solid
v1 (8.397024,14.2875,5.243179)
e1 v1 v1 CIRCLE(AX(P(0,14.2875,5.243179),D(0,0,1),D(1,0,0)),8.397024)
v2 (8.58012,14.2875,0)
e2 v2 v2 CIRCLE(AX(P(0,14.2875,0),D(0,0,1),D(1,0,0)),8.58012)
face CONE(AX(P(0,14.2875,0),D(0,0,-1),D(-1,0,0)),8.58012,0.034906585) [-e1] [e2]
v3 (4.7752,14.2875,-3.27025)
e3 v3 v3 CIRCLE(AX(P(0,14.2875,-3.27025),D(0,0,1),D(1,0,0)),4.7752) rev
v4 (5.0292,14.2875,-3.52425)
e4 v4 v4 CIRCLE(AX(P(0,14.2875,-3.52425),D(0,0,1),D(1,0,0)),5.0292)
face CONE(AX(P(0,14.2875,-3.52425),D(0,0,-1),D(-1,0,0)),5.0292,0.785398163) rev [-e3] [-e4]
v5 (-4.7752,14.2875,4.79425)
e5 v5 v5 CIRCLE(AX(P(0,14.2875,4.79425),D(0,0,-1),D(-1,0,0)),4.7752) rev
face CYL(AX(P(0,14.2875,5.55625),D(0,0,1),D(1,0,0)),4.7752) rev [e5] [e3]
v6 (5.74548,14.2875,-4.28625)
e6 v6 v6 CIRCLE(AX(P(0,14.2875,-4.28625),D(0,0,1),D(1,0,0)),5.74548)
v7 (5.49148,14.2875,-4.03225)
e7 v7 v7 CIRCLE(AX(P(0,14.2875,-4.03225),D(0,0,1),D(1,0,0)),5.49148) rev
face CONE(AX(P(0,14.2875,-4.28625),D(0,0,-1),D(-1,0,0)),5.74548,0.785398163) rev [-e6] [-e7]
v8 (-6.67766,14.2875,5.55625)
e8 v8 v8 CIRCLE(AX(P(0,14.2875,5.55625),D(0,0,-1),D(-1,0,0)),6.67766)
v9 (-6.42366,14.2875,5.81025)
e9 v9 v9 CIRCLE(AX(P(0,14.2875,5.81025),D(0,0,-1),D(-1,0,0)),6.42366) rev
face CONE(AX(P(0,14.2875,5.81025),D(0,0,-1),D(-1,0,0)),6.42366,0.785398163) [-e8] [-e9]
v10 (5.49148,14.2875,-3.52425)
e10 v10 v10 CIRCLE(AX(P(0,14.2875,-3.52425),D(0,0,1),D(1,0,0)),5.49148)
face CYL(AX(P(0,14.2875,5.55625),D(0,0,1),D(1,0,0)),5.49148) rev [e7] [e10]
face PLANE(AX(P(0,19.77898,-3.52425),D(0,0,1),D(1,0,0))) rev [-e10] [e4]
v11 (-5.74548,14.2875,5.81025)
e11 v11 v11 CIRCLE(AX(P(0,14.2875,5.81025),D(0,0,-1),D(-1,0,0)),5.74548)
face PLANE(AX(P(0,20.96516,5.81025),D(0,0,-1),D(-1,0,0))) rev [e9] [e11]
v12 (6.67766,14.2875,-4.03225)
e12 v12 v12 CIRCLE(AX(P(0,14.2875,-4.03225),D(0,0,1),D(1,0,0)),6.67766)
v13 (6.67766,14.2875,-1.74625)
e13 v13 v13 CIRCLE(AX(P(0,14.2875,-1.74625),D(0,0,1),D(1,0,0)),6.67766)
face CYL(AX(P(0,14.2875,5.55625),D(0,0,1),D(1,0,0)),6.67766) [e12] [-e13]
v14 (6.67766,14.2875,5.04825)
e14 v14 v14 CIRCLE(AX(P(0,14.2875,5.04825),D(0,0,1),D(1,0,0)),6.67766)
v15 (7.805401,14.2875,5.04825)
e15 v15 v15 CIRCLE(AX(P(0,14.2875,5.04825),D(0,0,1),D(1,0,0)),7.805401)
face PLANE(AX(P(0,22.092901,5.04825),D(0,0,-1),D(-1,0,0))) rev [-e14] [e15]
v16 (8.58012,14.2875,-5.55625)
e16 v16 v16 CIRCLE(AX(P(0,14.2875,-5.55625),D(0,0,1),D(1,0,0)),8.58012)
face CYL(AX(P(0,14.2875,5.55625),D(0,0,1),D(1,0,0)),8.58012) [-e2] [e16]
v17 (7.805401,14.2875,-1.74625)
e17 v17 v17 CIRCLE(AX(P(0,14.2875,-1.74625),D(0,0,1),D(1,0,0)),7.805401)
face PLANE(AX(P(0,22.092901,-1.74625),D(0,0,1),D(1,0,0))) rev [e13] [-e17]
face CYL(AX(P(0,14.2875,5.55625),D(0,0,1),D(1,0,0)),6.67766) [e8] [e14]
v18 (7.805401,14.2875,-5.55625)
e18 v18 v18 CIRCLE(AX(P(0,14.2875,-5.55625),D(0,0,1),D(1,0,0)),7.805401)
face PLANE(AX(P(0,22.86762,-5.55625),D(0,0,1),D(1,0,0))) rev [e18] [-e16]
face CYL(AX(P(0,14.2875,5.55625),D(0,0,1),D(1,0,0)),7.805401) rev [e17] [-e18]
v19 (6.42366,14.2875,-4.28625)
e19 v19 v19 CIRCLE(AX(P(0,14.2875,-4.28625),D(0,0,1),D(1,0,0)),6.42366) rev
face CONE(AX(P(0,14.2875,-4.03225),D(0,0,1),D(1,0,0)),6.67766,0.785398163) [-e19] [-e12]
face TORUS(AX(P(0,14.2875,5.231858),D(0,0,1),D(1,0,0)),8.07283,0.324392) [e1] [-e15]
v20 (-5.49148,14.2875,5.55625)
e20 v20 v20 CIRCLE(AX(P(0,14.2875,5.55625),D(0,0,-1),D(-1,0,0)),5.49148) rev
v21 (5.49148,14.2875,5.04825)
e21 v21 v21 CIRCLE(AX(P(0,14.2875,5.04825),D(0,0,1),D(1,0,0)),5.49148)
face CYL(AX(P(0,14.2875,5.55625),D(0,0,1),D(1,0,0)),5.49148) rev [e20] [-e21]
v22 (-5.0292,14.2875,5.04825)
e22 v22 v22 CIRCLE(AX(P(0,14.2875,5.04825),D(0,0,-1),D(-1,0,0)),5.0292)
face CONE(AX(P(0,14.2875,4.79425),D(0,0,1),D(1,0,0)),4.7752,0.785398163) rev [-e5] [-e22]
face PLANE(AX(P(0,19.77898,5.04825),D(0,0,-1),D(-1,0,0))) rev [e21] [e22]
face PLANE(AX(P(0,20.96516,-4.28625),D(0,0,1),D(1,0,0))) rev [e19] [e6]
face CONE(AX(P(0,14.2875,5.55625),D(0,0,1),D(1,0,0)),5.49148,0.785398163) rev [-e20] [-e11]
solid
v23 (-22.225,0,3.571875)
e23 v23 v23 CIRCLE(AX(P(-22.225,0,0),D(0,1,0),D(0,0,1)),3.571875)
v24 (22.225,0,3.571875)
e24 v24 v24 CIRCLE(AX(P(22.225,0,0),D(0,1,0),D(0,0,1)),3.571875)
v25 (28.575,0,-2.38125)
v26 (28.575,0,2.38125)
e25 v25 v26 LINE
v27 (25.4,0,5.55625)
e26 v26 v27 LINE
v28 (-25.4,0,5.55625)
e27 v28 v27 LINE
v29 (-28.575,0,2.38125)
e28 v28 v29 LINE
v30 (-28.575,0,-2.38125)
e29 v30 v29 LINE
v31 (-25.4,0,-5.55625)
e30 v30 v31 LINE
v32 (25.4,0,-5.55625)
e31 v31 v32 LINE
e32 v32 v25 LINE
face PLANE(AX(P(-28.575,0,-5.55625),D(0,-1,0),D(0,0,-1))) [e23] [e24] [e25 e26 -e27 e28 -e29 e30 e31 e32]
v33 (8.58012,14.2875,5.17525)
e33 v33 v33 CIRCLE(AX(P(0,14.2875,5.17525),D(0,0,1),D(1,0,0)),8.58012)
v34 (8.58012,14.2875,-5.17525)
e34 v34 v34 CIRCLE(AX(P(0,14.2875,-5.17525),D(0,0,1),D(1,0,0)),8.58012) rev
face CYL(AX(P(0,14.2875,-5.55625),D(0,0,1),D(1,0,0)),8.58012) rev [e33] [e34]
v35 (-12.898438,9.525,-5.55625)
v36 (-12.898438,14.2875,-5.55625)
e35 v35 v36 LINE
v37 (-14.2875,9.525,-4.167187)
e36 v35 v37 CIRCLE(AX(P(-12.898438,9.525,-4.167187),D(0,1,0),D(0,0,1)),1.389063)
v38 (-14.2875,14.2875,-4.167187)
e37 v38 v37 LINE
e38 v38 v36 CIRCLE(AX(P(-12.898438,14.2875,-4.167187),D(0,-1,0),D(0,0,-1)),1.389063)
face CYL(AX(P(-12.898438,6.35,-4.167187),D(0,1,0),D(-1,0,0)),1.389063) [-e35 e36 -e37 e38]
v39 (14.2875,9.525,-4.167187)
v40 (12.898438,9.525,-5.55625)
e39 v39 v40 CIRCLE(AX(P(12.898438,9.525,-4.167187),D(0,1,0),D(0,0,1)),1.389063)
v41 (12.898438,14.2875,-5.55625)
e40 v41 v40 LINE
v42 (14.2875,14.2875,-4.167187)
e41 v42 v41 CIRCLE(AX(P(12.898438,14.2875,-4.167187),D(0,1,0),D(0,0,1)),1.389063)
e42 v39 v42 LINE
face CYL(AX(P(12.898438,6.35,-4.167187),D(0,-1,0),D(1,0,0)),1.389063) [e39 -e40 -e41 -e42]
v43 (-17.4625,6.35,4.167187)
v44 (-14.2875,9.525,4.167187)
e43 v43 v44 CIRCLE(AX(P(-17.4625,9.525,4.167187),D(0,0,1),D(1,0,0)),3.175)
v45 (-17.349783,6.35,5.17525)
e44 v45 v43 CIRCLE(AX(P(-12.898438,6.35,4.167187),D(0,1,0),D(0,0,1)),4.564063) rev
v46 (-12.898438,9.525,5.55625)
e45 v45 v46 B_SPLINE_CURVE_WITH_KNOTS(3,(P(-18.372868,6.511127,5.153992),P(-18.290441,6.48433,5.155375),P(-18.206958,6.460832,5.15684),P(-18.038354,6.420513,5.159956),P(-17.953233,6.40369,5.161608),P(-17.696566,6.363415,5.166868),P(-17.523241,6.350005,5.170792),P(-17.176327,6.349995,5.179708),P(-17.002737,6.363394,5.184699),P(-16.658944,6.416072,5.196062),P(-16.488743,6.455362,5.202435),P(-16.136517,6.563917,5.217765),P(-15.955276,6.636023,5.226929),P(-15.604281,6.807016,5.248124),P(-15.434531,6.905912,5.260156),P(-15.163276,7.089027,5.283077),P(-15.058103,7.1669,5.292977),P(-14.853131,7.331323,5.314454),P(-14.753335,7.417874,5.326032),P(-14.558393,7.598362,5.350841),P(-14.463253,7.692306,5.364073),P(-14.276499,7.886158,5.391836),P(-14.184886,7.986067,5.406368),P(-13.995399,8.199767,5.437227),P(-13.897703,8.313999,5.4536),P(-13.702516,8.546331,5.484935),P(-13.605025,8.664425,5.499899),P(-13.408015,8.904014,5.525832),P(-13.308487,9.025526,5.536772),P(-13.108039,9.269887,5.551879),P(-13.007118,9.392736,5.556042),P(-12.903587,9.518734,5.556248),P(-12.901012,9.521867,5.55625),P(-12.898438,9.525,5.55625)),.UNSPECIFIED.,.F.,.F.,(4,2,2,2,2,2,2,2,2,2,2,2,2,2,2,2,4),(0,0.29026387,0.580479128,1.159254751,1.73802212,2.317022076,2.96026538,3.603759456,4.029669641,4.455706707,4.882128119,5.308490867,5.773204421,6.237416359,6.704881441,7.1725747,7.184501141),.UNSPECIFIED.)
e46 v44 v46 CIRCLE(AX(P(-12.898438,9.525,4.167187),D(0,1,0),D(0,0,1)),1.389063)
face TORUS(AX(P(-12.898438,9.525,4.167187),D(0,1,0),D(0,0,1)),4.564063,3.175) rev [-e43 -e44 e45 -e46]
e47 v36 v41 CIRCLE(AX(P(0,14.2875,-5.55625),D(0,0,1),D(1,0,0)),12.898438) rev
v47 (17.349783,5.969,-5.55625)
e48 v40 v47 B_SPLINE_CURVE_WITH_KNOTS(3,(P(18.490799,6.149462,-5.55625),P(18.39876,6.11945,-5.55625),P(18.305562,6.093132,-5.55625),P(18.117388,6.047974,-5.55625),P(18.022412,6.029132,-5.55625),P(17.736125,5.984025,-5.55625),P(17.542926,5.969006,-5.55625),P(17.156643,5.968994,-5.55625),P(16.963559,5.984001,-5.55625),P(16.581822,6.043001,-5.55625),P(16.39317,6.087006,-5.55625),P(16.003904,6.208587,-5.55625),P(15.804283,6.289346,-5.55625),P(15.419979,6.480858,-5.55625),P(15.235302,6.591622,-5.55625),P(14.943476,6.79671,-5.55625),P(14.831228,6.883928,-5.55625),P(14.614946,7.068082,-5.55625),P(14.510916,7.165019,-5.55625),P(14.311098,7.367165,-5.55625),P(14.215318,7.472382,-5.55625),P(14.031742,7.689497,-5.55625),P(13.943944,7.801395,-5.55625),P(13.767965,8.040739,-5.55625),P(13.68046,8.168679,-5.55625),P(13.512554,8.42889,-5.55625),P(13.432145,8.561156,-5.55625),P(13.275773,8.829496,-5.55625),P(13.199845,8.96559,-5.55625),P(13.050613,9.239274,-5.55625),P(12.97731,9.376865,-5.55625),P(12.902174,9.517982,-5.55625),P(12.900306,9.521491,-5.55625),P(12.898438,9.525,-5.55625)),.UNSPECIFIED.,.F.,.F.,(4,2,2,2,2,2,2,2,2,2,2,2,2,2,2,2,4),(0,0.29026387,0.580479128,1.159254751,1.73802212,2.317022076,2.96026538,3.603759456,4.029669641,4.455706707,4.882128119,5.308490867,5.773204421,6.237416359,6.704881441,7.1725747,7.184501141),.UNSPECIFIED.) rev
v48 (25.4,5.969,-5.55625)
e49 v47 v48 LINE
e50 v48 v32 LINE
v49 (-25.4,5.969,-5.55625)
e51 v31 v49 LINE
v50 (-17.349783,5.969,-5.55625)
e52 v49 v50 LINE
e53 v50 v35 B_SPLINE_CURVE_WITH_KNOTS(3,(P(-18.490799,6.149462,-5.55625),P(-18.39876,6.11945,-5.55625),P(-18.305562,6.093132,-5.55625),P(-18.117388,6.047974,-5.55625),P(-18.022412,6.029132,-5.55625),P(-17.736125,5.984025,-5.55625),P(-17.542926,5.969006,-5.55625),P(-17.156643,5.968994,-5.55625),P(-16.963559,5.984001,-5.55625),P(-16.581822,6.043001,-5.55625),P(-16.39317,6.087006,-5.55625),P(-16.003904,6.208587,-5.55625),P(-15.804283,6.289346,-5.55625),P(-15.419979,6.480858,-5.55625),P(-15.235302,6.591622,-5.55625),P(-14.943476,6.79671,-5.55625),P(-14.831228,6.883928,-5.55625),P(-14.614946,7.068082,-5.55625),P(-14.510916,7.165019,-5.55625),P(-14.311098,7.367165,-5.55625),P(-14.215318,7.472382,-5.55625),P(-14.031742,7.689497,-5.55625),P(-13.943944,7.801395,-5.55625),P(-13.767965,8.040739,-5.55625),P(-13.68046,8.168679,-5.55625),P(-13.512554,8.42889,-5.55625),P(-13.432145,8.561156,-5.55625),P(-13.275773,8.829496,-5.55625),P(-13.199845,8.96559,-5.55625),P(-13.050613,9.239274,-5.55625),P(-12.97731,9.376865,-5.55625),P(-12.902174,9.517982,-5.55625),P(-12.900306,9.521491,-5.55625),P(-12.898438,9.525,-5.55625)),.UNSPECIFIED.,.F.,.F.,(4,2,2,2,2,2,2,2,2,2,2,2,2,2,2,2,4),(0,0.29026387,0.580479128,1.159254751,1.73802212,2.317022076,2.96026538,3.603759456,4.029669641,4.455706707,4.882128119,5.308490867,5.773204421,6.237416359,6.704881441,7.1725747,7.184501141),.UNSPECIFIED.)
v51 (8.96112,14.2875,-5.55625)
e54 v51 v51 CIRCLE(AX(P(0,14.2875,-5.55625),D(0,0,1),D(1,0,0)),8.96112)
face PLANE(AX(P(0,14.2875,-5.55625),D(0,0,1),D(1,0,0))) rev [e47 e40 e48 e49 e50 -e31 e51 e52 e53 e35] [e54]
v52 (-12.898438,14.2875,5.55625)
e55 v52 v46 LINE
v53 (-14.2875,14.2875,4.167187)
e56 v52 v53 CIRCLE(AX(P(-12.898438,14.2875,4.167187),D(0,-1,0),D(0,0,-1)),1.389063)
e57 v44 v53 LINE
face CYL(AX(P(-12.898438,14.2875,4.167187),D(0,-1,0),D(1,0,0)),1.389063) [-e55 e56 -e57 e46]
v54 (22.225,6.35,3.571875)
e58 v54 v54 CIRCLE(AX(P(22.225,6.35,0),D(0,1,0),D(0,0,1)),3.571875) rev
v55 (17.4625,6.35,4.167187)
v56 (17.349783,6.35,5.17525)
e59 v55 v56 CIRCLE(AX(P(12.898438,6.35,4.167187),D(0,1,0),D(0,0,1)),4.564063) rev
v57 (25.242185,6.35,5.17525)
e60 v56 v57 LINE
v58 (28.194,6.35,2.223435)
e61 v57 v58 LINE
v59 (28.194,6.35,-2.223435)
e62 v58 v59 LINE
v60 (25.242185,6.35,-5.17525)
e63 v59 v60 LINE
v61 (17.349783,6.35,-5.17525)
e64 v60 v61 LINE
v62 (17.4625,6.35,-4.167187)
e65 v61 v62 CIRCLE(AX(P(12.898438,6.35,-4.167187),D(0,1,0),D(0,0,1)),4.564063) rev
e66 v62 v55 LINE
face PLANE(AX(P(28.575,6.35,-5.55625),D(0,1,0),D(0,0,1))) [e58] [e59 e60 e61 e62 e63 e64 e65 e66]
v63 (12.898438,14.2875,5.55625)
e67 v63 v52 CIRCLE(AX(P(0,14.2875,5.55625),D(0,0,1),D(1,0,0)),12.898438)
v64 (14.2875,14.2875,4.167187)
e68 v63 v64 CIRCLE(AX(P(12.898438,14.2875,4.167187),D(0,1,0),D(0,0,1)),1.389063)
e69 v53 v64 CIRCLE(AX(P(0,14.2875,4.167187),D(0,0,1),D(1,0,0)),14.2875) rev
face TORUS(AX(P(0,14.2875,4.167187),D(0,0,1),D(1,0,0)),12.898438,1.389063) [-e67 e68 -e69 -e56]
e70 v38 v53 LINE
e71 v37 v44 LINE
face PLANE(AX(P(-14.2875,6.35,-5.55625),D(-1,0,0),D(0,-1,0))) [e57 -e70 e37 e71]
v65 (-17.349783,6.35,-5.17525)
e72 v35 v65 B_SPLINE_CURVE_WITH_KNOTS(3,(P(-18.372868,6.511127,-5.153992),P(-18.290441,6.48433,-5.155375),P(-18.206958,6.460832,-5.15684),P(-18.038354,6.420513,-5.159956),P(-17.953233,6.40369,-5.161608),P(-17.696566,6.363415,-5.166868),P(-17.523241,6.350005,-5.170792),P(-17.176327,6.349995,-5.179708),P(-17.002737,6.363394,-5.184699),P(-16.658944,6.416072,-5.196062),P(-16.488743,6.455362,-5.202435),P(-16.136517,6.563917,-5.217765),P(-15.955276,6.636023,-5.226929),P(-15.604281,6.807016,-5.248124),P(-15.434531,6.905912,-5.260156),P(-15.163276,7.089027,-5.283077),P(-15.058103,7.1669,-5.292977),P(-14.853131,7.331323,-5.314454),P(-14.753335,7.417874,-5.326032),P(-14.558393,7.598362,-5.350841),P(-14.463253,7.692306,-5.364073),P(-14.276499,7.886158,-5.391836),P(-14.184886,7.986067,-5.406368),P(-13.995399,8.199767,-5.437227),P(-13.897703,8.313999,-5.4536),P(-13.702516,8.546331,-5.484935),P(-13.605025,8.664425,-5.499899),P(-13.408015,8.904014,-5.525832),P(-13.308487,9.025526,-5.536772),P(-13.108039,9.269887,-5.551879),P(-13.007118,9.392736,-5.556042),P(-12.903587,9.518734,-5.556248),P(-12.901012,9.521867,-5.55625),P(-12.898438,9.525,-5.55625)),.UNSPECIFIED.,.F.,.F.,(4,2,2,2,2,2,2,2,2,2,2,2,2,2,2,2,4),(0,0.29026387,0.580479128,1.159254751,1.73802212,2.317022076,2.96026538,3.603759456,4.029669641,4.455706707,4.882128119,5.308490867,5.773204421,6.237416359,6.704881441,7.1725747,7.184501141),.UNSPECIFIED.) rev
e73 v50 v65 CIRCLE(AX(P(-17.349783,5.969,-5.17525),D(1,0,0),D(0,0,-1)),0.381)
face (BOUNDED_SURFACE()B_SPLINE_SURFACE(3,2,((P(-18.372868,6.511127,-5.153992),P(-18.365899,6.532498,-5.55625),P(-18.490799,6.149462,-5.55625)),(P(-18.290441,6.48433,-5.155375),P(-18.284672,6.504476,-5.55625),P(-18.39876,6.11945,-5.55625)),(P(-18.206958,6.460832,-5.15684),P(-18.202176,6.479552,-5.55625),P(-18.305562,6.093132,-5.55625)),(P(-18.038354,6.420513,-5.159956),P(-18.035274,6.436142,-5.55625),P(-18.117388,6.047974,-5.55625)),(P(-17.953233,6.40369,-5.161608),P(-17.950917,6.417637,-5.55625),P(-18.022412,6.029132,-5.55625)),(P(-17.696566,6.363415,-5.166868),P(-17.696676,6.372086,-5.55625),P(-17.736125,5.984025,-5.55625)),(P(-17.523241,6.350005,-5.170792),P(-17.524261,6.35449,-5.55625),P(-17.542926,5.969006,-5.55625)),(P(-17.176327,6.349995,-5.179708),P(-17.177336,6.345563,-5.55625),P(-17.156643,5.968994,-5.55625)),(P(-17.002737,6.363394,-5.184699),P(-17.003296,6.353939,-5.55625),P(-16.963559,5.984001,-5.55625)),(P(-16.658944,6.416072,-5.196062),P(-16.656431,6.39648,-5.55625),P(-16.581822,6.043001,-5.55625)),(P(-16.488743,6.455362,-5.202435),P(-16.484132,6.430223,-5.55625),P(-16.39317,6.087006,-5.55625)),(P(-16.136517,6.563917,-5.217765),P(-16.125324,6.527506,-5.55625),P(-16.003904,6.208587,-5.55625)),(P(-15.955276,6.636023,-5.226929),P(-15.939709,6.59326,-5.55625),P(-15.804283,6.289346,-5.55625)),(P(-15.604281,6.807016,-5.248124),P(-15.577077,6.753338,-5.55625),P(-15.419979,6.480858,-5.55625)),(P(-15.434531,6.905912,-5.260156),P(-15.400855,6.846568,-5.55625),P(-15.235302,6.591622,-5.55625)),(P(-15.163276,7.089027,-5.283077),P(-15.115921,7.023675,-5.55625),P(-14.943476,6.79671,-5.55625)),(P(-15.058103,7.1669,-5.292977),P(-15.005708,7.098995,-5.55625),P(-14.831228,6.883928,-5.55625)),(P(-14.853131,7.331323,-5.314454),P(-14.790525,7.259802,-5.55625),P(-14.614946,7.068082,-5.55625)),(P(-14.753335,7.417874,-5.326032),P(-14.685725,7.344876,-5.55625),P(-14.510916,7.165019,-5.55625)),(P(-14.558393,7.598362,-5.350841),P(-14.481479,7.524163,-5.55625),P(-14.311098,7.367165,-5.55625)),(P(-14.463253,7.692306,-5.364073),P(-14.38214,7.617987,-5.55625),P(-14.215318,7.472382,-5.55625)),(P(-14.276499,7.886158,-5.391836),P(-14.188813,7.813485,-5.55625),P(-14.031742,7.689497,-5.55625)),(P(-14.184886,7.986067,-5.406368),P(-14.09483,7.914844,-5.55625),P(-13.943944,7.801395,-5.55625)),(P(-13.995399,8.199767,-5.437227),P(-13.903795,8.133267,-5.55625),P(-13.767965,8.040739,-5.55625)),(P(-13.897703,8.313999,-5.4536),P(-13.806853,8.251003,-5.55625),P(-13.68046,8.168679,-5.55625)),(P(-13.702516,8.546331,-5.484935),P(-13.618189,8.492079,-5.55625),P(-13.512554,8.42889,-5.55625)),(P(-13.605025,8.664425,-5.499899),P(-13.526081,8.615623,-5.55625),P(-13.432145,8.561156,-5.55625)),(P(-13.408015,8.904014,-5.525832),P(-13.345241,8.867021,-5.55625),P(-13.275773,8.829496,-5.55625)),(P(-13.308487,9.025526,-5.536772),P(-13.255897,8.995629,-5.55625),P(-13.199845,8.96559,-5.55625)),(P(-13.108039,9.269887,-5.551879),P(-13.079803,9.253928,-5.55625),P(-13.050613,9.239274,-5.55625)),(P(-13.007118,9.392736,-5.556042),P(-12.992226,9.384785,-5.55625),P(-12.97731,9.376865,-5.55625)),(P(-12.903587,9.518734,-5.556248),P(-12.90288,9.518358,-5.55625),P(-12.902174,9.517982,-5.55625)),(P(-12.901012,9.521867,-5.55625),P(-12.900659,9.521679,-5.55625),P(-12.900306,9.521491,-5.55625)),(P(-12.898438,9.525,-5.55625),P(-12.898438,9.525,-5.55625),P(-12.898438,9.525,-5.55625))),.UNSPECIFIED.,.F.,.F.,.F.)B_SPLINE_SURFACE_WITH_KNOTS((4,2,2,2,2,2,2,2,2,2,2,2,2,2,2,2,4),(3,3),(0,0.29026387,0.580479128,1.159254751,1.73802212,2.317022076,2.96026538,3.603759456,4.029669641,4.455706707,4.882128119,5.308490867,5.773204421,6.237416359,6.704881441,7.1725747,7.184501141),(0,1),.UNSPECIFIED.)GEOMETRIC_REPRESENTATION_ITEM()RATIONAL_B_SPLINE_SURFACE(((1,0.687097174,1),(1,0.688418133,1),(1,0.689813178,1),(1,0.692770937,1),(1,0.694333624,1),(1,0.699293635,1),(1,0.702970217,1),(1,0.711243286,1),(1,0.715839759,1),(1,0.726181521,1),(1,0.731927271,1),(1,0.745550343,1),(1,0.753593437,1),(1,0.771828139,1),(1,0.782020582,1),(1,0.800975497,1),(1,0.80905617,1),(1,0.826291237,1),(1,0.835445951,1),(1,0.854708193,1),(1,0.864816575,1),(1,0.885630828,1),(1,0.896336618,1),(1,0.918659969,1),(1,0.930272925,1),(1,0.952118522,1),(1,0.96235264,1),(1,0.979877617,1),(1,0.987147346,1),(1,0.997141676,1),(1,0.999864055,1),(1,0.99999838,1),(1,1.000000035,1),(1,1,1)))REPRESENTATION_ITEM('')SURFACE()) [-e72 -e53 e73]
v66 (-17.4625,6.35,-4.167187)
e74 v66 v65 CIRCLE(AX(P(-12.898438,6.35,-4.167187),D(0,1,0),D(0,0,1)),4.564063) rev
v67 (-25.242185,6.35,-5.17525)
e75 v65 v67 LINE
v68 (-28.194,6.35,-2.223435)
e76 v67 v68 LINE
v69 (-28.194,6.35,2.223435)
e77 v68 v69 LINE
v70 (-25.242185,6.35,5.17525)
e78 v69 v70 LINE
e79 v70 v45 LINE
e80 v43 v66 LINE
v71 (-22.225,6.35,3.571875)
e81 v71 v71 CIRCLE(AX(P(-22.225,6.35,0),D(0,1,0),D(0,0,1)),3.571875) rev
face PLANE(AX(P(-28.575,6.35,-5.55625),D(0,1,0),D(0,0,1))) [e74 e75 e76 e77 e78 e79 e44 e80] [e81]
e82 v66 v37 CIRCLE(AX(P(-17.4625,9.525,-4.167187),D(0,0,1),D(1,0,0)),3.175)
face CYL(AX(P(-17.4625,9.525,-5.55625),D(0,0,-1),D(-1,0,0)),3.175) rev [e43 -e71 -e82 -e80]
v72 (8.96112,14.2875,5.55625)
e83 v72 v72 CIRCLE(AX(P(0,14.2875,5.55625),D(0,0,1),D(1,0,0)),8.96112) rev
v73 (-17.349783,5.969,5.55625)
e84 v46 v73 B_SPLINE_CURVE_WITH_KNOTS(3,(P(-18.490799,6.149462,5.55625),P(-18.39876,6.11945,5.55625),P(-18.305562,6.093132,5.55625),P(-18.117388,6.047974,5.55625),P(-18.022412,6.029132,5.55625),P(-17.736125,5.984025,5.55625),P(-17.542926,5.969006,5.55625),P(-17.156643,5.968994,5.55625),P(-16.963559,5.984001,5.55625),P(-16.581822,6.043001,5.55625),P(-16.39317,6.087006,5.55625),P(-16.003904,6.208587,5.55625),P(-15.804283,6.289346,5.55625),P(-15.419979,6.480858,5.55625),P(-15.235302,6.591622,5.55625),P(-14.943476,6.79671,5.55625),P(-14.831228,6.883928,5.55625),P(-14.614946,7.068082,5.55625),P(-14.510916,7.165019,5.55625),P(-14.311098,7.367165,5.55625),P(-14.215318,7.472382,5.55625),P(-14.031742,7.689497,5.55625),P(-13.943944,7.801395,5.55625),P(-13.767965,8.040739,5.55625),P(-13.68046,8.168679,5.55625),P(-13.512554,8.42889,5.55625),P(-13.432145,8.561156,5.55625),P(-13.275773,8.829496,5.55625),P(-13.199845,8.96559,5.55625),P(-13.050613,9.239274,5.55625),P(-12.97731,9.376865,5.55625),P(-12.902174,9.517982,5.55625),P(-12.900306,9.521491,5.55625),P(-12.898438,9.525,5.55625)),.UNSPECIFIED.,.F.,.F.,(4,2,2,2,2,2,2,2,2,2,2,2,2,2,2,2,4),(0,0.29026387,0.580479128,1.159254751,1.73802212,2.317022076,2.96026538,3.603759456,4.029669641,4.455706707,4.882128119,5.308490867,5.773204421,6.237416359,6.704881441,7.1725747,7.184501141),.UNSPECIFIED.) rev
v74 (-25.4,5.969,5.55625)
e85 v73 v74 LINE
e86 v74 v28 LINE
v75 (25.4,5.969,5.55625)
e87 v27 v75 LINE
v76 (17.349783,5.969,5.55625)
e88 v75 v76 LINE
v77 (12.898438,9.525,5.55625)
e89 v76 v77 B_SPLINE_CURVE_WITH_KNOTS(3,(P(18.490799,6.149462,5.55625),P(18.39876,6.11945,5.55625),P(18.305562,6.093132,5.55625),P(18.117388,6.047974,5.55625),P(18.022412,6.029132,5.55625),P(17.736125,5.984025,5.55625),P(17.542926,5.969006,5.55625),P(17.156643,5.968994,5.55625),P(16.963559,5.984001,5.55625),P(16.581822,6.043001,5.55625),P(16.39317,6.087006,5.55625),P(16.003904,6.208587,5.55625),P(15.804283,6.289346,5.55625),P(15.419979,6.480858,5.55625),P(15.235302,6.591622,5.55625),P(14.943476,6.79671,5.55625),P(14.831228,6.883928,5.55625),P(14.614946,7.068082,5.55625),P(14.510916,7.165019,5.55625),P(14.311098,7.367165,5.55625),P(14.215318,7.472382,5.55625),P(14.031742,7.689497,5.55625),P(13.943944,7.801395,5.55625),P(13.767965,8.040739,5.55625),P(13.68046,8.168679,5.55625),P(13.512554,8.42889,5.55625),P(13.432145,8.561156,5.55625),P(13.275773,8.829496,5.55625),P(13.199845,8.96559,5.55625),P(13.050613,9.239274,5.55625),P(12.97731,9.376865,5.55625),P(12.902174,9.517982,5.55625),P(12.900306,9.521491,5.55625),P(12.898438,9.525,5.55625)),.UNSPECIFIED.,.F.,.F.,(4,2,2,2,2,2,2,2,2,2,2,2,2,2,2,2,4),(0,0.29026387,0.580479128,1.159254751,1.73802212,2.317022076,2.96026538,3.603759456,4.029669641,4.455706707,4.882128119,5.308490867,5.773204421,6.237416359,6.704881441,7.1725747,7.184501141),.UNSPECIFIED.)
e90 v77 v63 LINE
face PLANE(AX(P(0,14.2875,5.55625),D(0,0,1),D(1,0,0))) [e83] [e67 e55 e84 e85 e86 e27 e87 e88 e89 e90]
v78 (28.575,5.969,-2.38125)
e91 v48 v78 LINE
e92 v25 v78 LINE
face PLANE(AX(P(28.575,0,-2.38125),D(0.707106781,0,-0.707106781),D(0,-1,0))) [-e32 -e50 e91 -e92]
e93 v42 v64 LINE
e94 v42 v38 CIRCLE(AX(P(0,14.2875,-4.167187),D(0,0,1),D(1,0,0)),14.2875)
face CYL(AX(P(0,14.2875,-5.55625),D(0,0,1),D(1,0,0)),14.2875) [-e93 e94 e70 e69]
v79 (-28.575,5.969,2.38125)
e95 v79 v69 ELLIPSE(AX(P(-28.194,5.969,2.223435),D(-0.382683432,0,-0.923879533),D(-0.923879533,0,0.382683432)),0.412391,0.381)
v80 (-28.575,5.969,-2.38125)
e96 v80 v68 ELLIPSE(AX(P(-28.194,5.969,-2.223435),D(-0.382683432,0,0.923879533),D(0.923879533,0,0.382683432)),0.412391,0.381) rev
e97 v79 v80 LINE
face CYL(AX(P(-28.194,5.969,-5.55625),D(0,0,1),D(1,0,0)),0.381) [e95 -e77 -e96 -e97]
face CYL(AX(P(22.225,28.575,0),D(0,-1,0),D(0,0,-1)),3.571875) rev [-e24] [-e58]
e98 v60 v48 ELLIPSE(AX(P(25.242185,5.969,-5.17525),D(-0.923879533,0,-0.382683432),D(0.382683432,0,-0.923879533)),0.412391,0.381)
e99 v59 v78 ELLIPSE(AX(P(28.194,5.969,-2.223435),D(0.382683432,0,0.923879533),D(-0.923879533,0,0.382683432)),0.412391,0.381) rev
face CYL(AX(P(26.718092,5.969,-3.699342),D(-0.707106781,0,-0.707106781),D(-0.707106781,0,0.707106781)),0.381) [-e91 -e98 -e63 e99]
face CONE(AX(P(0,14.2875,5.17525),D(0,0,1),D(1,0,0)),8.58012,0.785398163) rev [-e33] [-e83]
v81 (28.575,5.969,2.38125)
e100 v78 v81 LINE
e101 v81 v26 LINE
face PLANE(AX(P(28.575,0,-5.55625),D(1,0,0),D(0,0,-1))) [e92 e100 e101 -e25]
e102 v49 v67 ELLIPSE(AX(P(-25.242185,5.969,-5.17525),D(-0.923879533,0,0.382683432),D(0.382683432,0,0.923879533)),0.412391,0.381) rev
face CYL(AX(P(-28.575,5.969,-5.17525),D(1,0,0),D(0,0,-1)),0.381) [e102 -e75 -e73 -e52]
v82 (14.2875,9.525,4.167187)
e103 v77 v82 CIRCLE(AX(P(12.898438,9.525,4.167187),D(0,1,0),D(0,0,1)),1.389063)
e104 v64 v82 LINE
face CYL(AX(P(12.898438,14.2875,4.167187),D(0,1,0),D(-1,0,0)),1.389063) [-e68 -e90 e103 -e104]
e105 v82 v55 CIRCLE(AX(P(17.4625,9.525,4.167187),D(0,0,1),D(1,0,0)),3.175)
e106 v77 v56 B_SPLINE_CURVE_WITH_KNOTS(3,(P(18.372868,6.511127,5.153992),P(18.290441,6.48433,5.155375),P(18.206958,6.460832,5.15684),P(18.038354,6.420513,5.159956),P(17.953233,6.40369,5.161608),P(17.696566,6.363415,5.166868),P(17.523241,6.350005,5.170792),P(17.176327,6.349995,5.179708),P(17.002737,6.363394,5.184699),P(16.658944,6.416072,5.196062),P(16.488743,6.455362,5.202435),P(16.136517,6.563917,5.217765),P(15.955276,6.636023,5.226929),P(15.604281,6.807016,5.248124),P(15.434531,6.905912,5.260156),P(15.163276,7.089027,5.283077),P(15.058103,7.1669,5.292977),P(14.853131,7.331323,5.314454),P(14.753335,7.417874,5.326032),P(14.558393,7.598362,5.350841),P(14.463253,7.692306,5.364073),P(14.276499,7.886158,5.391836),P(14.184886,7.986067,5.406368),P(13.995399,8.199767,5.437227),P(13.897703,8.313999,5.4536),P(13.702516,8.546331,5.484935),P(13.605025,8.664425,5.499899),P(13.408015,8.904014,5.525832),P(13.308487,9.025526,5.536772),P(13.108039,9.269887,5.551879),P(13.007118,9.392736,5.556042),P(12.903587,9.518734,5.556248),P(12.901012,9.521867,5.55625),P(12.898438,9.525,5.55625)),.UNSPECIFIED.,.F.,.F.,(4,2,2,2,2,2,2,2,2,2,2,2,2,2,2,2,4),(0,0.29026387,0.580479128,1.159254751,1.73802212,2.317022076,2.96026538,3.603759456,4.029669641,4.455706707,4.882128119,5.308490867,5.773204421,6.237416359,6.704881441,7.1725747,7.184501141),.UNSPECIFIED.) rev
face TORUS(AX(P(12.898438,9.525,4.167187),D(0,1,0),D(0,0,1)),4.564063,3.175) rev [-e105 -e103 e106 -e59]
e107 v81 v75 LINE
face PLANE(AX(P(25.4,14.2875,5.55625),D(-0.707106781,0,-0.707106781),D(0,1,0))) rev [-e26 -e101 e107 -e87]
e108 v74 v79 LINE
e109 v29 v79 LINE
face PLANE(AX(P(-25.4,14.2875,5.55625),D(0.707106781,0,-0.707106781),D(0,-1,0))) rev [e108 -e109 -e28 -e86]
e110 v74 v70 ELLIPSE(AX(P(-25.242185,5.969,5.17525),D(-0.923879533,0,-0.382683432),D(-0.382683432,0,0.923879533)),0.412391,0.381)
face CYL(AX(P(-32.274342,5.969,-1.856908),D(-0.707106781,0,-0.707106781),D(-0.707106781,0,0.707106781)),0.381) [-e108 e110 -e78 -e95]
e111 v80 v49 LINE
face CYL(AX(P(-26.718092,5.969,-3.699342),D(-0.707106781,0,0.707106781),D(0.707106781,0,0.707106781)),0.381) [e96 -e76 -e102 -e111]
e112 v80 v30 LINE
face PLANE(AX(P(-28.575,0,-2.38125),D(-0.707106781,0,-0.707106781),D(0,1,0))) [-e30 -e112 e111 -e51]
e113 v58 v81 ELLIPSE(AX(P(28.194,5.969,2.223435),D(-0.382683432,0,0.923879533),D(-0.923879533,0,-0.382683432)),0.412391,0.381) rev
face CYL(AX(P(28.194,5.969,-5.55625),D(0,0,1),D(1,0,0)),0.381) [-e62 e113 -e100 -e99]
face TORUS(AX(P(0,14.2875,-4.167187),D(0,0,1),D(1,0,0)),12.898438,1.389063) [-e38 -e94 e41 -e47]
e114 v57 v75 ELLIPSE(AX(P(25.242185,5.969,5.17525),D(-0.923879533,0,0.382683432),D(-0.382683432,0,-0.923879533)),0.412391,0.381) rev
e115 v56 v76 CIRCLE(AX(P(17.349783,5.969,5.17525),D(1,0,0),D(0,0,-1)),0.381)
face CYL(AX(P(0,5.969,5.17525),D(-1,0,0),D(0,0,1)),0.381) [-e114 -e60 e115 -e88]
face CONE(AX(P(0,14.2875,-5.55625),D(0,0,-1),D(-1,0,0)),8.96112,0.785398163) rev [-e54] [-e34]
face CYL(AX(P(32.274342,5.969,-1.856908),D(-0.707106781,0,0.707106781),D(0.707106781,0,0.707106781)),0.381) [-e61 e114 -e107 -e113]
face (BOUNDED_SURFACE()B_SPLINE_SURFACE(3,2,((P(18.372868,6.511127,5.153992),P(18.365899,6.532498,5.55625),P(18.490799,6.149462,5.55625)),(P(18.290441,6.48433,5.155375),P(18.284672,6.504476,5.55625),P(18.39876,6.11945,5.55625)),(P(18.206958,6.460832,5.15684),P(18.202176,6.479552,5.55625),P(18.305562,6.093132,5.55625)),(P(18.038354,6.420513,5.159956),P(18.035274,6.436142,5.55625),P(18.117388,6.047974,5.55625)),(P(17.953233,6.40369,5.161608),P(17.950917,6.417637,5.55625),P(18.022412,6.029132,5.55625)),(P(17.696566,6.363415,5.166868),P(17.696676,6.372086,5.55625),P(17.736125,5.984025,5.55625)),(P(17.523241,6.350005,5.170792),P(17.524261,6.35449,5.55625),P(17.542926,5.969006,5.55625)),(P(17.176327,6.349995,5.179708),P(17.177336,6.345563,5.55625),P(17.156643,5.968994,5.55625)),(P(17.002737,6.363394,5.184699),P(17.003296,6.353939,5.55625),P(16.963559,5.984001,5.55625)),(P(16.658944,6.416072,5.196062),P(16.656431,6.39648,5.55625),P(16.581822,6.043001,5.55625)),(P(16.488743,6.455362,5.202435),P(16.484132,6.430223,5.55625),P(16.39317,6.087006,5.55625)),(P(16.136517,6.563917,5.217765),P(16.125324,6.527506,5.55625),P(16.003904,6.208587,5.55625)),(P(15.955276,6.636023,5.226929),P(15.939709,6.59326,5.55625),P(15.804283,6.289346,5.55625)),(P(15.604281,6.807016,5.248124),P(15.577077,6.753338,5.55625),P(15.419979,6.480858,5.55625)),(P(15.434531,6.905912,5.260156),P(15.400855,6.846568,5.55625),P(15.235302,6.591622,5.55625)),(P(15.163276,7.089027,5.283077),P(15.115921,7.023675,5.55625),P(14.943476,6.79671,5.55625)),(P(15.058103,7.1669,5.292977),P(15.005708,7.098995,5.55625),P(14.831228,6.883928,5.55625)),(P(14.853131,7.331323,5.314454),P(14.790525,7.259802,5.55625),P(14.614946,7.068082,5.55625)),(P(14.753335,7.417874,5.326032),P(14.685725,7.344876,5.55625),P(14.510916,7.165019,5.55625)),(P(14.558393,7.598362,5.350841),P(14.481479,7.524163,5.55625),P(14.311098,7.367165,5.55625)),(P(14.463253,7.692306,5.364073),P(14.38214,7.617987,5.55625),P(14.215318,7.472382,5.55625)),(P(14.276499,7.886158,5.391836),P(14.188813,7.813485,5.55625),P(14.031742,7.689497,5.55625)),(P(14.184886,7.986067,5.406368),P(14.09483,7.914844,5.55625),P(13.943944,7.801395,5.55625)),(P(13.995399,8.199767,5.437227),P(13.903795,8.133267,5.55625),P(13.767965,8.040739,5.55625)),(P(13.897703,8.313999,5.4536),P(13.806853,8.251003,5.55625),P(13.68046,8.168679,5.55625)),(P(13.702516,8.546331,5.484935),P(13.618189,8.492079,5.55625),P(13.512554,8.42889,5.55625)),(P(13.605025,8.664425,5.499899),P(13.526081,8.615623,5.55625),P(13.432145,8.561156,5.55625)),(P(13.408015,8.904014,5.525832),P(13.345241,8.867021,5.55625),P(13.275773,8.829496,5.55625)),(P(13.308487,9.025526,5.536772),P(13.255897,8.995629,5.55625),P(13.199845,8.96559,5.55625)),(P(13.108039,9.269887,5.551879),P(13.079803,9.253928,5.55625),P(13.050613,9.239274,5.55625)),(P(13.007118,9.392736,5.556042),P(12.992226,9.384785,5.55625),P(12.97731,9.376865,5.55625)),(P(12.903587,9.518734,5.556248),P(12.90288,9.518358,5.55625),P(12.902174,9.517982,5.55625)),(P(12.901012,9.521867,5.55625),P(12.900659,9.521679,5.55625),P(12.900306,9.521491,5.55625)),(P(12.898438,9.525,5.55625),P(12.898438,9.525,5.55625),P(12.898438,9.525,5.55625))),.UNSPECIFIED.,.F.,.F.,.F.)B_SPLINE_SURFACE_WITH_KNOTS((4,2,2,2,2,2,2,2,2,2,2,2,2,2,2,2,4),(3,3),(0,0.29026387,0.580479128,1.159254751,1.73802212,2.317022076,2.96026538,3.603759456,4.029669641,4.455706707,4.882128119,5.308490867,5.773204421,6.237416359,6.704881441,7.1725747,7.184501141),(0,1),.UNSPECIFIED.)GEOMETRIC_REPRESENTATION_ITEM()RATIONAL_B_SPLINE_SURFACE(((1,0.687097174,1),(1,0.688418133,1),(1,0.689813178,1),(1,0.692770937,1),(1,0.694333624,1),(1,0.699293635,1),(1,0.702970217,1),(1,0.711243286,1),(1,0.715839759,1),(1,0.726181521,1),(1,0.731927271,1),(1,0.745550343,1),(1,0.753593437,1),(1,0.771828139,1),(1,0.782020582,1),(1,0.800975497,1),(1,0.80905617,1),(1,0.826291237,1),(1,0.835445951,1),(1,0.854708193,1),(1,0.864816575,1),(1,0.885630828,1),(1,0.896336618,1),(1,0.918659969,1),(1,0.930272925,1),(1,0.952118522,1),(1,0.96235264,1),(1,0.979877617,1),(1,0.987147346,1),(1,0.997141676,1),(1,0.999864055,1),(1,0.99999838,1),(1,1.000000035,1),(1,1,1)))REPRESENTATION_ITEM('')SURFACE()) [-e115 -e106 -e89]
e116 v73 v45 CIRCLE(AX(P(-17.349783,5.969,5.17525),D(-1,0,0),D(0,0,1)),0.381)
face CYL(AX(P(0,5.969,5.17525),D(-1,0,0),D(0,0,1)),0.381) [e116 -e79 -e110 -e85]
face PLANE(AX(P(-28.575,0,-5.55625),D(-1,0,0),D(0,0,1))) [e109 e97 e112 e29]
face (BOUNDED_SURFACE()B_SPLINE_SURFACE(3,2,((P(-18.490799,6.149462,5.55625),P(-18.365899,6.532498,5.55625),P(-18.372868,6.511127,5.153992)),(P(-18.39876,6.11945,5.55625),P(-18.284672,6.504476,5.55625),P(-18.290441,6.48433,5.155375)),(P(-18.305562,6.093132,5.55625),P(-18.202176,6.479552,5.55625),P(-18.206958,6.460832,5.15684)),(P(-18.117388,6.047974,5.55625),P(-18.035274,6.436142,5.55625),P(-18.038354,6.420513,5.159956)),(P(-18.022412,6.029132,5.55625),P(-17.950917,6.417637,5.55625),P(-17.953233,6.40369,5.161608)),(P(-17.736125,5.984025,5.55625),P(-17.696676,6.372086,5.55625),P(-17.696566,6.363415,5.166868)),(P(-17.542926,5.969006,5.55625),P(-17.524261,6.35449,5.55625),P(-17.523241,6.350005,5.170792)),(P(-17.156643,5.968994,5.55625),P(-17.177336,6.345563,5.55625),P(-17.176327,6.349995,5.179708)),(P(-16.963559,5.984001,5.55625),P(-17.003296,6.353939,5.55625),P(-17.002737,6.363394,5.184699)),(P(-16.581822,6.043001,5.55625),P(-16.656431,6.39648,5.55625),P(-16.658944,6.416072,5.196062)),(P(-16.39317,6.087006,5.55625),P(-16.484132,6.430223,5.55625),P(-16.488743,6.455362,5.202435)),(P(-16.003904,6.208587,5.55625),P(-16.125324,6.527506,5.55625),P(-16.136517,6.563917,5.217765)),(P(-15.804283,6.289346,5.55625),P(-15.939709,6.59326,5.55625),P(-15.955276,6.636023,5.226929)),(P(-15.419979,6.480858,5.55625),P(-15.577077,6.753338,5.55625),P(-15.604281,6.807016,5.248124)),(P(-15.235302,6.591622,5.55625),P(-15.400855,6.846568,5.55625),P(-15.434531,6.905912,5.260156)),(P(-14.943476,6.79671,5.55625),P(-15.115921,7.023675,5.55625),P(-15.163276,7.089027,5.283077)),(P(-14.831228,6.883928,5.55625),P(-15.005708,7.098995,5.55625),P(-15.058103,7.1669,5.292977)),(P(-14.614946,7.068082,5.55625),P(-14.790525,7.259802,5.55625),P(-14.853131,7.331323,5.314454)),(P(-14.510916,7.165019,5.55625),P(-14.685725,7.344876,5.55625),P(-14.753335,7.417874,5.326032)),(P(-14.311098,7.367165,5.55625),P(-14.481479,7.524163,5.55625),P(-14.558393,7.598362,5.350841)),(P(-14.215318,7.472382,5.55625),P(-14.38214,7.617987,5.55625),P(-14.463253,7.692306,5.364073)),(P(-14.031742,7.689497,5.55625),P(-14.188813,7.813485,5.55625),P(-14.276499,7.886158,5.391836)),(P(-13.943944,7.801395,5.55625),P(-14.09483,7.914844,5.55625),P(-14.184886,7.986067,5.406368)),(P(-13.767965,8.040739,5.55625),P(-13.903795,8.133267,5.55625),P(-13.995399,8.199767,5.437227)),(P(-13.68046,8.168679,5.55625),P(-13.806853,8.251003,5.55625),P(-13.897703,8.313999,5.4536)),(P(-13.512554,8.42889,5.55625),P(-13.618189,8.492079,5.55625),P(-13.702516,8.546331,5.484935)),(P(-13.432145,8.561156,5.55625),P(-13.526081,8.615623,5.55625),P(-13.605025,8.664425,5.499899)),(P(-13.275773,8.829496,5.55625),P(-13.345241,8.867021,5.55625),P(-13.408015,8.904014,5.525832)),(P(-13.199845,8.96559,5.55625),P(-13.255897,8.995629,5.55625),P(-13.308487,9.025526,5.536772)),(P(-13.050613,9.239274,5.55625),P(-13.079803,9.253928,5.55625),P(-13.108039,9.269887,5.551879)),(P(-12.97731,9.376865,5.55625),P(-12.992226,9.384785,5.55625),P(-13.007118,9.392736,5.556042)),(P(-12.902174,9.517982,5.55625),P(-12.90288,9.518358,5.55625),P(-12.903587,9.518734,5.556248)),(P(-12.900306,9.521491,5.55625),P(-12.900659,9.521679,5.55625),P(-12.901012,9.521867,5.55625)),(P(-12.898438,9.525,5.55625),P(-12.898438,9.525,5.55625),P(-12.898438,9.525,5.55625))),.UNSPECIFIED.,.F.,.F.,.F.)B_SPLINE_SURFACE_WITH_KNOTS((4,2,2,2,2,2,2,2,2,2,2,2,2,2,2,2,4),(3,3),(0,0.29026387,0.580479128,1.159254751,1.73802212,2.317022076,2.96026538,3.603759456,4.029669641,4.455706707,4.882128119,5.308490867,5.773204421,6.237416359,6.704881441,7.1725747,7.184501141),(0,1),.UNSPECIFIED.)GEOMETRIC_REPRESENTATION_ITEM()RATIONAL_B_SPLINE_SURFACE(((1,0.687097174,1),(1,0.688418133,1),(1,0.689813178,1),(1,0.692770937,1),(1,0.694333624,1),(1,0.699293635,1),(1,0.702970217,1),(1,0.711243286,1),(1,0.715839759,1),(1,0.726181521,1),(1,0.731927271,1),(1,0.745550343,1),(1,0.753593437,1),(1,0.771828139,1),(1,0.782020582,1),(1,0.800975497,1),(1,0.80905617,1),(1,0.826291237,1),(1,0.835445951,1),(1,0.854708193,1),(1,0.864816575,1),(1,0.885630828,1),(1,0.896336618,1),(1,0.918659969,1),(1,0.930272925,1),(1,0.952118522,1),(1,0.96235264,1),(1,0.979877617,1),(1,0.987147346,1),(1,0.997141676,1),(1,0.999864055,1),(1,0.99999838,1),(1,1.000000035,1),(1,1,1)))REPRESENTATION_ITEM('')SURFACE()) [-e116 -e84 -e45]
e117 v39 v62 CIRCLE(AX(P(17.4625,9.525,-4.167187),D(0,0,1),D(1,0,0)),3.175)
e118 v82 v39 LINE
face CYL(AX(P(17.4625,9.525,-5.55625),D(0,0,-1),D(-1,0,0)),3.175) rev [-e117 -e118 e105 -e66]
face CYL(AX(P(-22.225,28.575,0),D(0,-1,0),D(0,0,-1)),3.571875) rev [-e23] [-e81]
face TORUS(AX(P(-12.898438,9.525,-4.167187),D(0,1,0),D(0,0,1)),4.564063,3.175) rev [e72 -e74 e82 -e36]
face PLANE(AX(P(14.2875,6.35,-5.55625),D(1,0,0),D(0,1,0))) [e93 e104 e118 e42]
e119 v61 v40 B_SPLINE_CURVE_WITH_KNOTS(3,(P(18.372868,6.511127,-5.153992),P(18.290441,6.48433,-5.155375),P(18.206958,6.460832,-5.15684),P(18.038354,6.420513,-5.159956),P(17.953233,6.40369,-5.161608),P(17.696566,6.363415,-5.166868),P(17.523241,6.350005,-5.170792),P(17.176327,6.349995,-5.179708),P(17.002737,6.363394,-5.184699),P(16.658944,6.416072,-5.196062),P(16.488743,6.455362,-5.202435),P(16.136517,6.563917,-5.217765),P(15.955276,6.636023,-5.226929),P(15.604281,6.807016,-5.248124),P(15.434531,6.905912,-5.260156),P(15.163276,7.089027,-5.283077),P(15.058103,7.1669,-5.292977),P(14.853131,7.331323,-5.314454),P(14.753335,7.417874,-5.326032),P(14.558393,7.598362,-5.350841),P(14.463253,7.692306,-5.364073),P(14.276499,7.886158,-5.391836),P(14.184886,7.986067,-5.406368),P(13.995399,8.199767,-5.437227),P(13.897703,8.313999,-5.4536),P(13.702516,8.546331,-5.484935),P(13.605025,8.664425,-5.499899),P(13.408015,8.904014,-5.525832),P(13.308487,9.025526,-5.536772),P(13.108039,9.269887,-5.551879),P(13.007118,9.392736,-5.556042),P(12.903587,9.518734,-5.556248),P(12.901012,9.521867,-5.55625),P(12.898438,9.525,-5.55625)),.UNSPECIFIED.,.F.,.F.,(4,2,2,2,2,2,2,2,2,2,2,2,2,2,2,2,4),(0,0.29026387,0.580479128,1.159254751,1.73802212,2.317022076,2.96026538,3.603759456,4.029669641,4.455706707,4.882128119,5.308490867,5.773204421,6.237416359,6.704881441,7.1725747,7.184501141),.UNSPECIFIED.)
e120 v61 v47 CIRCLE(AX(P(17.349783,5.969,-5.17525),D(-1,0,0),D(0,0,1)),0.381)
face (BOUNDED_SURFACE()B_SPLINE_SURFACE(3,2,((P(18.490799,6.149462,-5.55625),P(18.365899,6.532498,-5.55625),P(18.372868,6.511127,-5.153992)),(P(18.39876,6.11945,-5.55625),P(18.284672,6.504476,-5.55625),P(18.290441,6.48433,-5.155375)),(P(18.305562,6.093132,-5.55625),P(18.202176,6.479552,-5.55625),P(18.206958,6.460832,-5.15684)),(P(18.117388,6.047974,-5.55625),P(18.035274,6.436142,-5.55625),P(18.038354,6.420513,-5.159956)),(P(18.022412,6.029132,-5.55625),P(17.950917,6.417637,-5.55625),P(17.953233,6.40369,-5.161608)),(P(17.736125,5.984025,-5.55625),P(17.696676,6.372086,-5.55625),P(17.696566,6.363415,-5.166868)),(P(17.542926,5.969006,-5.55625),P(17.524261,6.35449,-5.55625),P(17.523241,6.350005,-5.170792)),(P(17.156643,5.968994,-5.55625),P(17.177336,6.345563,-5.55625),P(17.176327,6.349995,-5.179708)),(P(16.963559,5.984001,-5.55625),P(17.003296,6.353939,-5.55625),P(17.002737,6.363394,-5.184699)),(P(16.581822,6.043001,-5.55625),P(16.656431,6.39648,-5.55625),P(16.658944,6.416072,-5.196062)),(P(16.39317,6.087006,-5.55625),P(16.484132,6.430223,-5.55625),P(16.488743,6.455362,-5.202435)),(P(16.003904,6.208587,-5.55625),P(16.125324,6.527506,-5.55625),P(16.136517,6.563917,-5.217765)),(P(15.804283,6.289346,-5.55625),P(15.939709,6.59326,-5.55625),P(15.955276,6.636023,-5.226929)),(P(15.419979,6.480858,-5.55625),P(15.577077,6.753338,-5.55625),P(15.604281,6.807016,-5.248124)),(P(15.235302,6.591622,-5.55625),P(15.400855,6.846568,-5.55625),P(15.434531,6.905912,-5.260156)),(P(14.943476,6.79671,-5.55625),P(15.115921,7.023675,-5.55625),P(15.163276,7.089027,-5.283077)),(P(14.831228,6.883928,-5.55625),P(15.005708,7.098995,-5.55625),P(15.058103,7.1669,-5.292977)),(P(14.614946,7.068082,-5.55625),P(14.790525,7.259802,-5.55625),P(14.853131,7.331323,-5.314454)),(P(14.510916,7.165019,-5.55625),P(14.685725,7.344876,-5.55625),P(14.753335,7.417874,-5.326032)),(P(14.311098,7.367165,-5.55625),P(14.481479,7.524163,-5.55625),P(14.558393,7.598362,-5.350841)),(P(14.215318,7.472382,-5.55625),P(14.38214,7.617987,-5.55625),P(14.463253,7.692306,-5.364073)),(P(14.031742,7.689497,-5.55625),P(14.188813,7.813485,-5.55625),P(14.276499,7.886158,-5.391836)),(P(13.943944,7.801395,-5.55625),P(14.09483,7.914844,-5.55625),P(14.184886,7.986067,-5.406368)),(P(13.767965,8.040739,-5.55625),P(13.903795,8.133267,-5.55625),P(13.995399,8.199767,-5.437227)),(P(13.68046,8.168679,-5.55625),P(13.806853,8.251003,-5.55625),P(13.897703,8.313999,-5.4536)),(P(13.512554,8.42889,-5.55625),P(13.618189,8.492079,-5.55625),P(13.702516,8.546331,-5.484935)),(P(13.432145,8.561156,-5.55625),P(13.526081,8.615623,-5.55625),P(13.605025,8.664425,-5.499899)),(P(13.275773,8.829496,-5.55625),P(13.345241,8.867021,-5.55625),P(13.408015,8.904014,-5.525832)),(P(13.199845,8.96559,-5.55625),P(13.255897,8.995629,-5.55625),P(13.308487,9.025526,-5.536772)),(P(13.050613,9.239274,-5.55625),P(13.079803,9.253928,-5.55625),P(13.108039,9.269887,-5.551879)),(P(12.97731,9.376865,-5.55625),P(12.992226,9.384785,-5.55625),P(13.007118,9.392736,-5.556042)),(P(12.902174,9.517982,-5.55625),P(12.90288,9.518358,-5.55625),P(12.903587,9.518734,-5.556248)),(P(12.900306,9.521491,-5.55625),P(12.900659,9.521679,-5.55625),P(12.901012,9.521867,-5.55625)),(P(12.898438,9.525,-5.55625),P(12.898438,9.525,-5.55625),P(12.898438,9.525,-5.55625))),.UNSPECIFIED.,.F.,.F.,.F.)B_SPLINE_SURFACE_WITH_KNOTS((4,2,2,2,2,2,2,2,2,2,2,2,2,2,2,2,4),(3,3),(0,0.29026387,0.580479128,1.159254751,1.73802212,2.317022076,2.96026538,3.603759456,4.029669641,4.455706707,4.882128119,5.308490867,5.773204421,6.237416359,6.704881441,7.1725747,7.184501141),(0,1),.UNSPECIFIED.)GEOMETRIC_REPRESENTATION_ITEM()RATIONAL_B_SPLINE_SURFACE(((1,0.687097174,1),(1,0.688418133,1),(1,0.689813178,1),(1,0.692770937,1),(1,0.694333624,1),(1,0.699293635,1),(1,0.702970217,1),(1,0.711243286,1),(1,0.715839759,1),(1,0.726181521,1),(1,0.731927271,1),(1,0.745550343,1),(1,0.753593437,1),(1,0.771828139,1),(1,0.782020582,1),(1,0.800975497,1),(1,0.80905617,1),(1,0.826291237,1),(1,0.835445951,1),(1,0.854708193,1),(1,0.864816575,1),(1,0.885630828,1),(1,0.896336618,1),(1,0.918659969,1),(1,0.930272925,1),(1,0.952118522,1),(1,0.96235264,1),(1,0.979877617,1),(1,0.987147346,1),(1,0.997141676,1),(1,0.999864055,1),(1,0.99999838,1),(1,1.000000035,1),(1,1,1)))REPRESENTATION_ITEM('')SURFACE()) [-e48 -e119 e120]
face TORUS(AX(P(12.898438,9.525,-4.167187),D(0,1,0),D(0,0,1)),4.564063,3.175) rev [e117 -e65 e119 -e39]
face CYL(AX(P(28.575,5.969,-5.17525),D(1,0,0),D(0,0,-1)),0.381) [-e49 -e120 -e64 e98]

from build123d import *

# Parameters (mm, degrees)
BOSS_EXTRUDE1_DEPTH      = 5.55625
BOSS_EXTRUDE1_DEPTH_BACK = 5.55625
SKETCH3_R                = 8.58012
SKETCH4_R                = 3.571875
CUT_EXTRUDE1_DEPTH       = 41.791336875
CHAMFER1_SIZE            = 3.175
FILLET1_R                = 1.3890625
FILLET2_R                = 3.175
CHAMFER2_SIZE            = 0.381
FILLET3_R                = 0.381
CHAMFER3_SIZE            = 0.254


with BuildPart() as part:
    # Sketch3 → Boss-Extrude1 (new, two sides: drawn at the far end of the back side and taken through both)
    with BuildSketch(Plane.XY.offset(-BOSS_EXTRUDE1_DEPTH_BACK)):
        with BuildLine():
            Line((-28.575, 0), (-28.575, 6.35))
            Line((-28.575, 6.35), (-14.2875, 6.35))
            Line((-14.2875, 6.35), (-14.2875, 14.2875))
            ThreePointArc((-14.2875, 14.2875), (0, 28.575), (14.2875, 14.2875))
            Line((14.2875, 14.2875), (14.2875, 6.35))
            Line((14.2875, 6.35), (28.575, 6.35))
            Line((28.575, 6.35), (28.575, 0))
            Line((28.575, 0), (-28.575, 0))
        make_face()
        with Locations((0, 14.2875)):
            Circle(SKETCH3_R, mode=Mode.SUBTRACT)
    extrude(amount=BOSS_EXTRUDE1_DEPTH + BOSS_EXTRUDE1_DEPTH_BACK)

    # Sketch4 → Cut-Extrude1 (cut, through all)
    with BuildSketch(Plane(origin=(0, 0, 0), x_dir=(1, 0, 0), z_dir=(0, 1, 0))):
        with Locations(Location((-22.225, 0, 0), (0, 0, 270))):
            Circle(SKETCH4_R)
        with Locations(Location((22.225, 0, 0), (0, 0, 270))):
            Circle(SKETCH4_R)
    extrude(amount=CUT_EXTRUDE1_DEPTH, mode=Mode.SUBTRACT)

    # Chamfer1
    chamfer1_edges = [part.edges().sort_by_distance(p)[0] for p in [
        (28.575, 3.175, 5.55625),
        (-28.575, 3.175, -5.55625),
        (-28.575, 3.175, 5.55625),
        (28.575, 3.175, -5.55625),
    ]]
    chamfer(chamfer1_edges, length=CHAMFER1_SIZE)

    # Fillet1
    fillet1_edges = [part.edges().sort_by_distance(p)[0] for p in [
        (14.2875, 10.31875, -5.55625),
        (0, 28.575, -5.55625),
        (-14.2875, 10.31875, -5.55625),
        (14.2875, 10.31875, 5.55625),
        (0, 28.575, 5.55625),
        (-14.2875, 10.31875, 5.55625),
    ]]
    fillet(fillet1_edges, radius=FILLET1_R)

    # Fillet2
    # the kernel refuses this fillet: 3.175 mm, written as the material it adds along each edge
    with BuildSketch(Plane(origin=(-14.2875, 6.35, 4.1671875), x_dir=(-1, 0, 0), z_dir=(0, 0, -1))) as fillet2_piece_1:
        with BuildLine():
            CenterArc((FILLET2_R, FILLET2_R), FILLET2_R, 180, 90)
            Line((0, FILLET2_R), (0, 0))
            Line((0, 0), (FILLET2_R, 0))
        make_face()
    extrude(amount=8.334375)
    with BuildSketch(Plane(origin=(14.2875, 6.35, 4.1671875), x_dir=(1, 0, 0), z_dir=(0, 0, -1))) as fillet2_piece_2:
        with BuildLine():
            CenterArc((FILLET2_R, -FILLET2_R), FILLET2_R, 90, 90)
            Line((0, -FILLET2_R), (0, 0))
            Line((0, 0), (FILLET2_R, 0))
        make_face()
    extrude(amount=8.334375)
    with BuildSketch(Plane(origin=(-12.8984375, 6.35, -4.1671875), x_dir=(-0.9999802608561372, 0, 0.006283143965558251), z_dir=(-0.006283143965558251, 0, -0.9999802608561372))) as fillet2_piece_3_section:
        with BuildLine():
            CenterArc((1.3890625 + FILLET2_R, FILLET2_R), FILLET2_R, 180, 90)
            Line((1.3890625, FILLET2_R), (1.3890625, 0))
            Line((1.3890625, 0), (1.3890625 + FILLET2_R, 0))
        make_face()
    fillet2_piece_3 = revolve(axis=Axis((-12.8984375, 6.35, -4.1671875), (0, 1, 0)), revolution_arc=359.64, mode=Mode.PRIVATE)
    fillet2_piece_3 = split(fillet2_piece_3, bisect_by=Plane(origin=(-12.8984375, 6.35, -5.55625), z_dir=(0, 0, 1)), keep=Keep.TOP, mode=Mode.PRIVATE)
    add(fillet2_piece_3)
    with BuildSketch(Plane(origin=(-12.8984375, 6.35, 4.1671875), x_dir=(-0.9999802608561372, 0, -0.006283143965558251), z_dir=(-0.006283143965558251, 0, 0.9999802608561372))) as fillet2_piece_4_section:
        with BuildLine():
            CenterArc((1.3890625 + FILLET2_R, -FILLET2_R), FILLET2_R, 90, 90)
            Line((1.3890625, -FILLET2_R), (1.3890625, 0))
            Line((1.3890625, 0), (1.3890625 + FILLET2_R, 0))
        make_face()
    fillet2_piece_4 = revolve(axis=Axis((-12.8984375, 6.35, 4.1671875), (0, -1, 0)), revolution_arc=359.64, mode=Mode.PRIVATE)
    fillet2_piece_4 = split(fillet2_piece_4, bisect_by=Plane(origin=(-12.8984375, 6.35, 5.55625), z_dir=(0, 0, -1)), keep=Keep.TOP, mode=Mode.PRIVATE)
    add(fillet2_piece_4)
    with BuildSketch(Plane(origin=(12.8984375, 6.35, -4.1671875), x_dir=(0.9999802608561372, 0, 0.006283143965558251), z_dir=(0.006283143965558251, 0, -0.9999802608561372))) as fillet2_piece_5_section:
        with BuildLine():
            CenterArc((1.3890625 + FILLET2_R, -FILLET2_R), FILLET2_R, 90, 90)
            Line((1.3890625, -FILLET2_R), (1.3890625, 0))
            Line((1.3890625, 0), (1.3890625 + FILLET2_R, 0))
        make_face()
    fillet2_piece_5 = revolve(axis=Axis((12.8984375, 6.35, -4.1671875), (0, -1, 0)), revolution_arc=359.64, mode=Mode.PRIVATE)
    fillet2_piece_5 = split(fillet2_piece_5, bisect_by=Plane(origin=(12.8984375, 6.35, -5.55625), z_dir=(0, 0, 1)), keep=Keep.TOP, mode=Mode.PRIVATE)
    add(fillet2_piece_5)
    with BuildSketch(Plane(origin=(12.8984375, 6.35, 4.1671875), x_dir=(0.9999802608561372, 0, -0.006283143965558251), z_dir=(0.006283143965558251, 0, 0.9999802608561372))) as fillet2_piece_6_section:
        with BuildLine():
            CenterArc((1.3890625 + FILLET2_R, FILLET2_R), FILLET2_R, 180, 90)
            Line((1.3890625, FILLET2_R), (1.3890625, 0))
            Line((1.3890625, 0), (1.3890625 + FILLET2_R, 0))
        make_face()
    fillet2_piece_6 = revolve(axis=Axis((12.8984375, 6.35, 4.1671875), (0, 1, 0)), revolution_arc=359.64, mode=Mode.PRIVATE)
    fillet2_piece_6 = split(fillet2_piece_6, bisect_by=Plane(origin=(12.8984375, 6.35, 5.55625), z_dir=(0, 0, -1)), keep=Keep.TOP, mode=Mode.PRIVATE)
    add(fillet2_piece_6)

    # Chamfer2
    chamfer2_edges = [part.edges().sort_by_distance(p)[0] for p in [
        (-8.58012, 14.2875, -5.55625),
        (-8.58012, 14.2875, 5.55625),
    ]]
    chamfer(chamfer2_edges, length=CHAMFER2_SIZE)

    # Fillet3
    fillet3_edges = [part.edges().sort_by_distance(p)[0] for p in [
        (-21.32299265, 6.35, -5.55625),
        (-21.32299265, 6.35, 5.55625),
        (-14.671838579, 7.348302589, -5.55625),
        (-14.67183858, 7.348302588, 5.55625),
        (14.67183858, 7.348302588, -5.55625),
        (14.671838579, 7.348302589, 5.55625),
        (-28.575, 6.35, 0),
        (21.32299265, 6.35, -5.55625),
        (-26.9875, 6.35, 3.96875),
        (-26.9875, 6.35, -3.96875),
        (21.32299265, 6.35, 5.55625),
        (28.575, 6.35, 0),
        (26.9875, 6.35, -3.96875),
        (26.9875, 6.35, 3.96875),
    ]]
    fillet(fillet3_edges, radius=FILLET3_R)


with BuildPart() as body_2:
    # Sketch6 → Revolve1 (revolve)
    with BuildSketch(Plane(origin=(0, 0, 0), x_dir=(0, 0, -1), z_dir=(1, 0, 0)), mode=Mode.PRIVATE) as revolve1_sk:
        with BuildLine():
            Line((0, 22.86762), (5.55625, 22.86762))
            Line((5.55625, 22.86762), (5.55625, 22.092900628))
            Line((5.55625, 22.092900628), (1.74625, 22.092900628))
            Line((1.74625, 22.092900628), (1.74625, 20.96516))
            Line((1.74625, 20.96516), (4.28625, 20.96516))
            Line((4.28625, 20.96516), (4.28625, 19.77898))
            Line((4.28625, 19.77898), (3.52425, 19.77898))
            Line((3.52425, 19.77898), (3.52425, 19.0627))
            Line((3.52425, 19.0627), (-5.04825, 19.0627))
            Line((-5.04825, 19.0627), (-5.04825, 19.77898))
            Line((-5.04825, 19.77898), (-5.81025, 19.77898))
            Line((-5.81025, 19.77898), (-5.81025, 20.96516))
            Line((-5.81025, 20.96516), (-5.04825, 20.96516))
            Line((-5.04825, 20.96516), (-5.04825, 22.092900628))
            ThreePointArc((-5.04825, 22.092900628), (-5.539957431, 22.258816605), (-5.243179074, 22.684524152))
            Line((-5.243179074, 22.684524152), (0, 22.86762))
        make_face()
    revolve(revolve1_sk.sketch.rotate(Axis((0, 14.2875, 5.55625), (0, 0, -1)), 90), axis=Axis((0, 14.2875, 5.55625), (0, 0, -1)))

    # Chamfer3
    chamfer3_edges = [body_2.edges().sort_by_distance(p)[0] for p in [
        (-6.67766, 14.2875, -4.28625),
        (-5.49148, 14.2875, -4.28625),
        (-4.7752, 14.2875, -3.52425),
        (-4.7752, 14.2875, 5.04825),
        (-5.49148, 14.2875, 5.81025),
        (-6.67766, 14.2875, 5.81025),
    ]]
    chamfer(chamfer3_edges, length=CHAMFER3_SIZE)


solid = Compound([part.part, body_2.part])
